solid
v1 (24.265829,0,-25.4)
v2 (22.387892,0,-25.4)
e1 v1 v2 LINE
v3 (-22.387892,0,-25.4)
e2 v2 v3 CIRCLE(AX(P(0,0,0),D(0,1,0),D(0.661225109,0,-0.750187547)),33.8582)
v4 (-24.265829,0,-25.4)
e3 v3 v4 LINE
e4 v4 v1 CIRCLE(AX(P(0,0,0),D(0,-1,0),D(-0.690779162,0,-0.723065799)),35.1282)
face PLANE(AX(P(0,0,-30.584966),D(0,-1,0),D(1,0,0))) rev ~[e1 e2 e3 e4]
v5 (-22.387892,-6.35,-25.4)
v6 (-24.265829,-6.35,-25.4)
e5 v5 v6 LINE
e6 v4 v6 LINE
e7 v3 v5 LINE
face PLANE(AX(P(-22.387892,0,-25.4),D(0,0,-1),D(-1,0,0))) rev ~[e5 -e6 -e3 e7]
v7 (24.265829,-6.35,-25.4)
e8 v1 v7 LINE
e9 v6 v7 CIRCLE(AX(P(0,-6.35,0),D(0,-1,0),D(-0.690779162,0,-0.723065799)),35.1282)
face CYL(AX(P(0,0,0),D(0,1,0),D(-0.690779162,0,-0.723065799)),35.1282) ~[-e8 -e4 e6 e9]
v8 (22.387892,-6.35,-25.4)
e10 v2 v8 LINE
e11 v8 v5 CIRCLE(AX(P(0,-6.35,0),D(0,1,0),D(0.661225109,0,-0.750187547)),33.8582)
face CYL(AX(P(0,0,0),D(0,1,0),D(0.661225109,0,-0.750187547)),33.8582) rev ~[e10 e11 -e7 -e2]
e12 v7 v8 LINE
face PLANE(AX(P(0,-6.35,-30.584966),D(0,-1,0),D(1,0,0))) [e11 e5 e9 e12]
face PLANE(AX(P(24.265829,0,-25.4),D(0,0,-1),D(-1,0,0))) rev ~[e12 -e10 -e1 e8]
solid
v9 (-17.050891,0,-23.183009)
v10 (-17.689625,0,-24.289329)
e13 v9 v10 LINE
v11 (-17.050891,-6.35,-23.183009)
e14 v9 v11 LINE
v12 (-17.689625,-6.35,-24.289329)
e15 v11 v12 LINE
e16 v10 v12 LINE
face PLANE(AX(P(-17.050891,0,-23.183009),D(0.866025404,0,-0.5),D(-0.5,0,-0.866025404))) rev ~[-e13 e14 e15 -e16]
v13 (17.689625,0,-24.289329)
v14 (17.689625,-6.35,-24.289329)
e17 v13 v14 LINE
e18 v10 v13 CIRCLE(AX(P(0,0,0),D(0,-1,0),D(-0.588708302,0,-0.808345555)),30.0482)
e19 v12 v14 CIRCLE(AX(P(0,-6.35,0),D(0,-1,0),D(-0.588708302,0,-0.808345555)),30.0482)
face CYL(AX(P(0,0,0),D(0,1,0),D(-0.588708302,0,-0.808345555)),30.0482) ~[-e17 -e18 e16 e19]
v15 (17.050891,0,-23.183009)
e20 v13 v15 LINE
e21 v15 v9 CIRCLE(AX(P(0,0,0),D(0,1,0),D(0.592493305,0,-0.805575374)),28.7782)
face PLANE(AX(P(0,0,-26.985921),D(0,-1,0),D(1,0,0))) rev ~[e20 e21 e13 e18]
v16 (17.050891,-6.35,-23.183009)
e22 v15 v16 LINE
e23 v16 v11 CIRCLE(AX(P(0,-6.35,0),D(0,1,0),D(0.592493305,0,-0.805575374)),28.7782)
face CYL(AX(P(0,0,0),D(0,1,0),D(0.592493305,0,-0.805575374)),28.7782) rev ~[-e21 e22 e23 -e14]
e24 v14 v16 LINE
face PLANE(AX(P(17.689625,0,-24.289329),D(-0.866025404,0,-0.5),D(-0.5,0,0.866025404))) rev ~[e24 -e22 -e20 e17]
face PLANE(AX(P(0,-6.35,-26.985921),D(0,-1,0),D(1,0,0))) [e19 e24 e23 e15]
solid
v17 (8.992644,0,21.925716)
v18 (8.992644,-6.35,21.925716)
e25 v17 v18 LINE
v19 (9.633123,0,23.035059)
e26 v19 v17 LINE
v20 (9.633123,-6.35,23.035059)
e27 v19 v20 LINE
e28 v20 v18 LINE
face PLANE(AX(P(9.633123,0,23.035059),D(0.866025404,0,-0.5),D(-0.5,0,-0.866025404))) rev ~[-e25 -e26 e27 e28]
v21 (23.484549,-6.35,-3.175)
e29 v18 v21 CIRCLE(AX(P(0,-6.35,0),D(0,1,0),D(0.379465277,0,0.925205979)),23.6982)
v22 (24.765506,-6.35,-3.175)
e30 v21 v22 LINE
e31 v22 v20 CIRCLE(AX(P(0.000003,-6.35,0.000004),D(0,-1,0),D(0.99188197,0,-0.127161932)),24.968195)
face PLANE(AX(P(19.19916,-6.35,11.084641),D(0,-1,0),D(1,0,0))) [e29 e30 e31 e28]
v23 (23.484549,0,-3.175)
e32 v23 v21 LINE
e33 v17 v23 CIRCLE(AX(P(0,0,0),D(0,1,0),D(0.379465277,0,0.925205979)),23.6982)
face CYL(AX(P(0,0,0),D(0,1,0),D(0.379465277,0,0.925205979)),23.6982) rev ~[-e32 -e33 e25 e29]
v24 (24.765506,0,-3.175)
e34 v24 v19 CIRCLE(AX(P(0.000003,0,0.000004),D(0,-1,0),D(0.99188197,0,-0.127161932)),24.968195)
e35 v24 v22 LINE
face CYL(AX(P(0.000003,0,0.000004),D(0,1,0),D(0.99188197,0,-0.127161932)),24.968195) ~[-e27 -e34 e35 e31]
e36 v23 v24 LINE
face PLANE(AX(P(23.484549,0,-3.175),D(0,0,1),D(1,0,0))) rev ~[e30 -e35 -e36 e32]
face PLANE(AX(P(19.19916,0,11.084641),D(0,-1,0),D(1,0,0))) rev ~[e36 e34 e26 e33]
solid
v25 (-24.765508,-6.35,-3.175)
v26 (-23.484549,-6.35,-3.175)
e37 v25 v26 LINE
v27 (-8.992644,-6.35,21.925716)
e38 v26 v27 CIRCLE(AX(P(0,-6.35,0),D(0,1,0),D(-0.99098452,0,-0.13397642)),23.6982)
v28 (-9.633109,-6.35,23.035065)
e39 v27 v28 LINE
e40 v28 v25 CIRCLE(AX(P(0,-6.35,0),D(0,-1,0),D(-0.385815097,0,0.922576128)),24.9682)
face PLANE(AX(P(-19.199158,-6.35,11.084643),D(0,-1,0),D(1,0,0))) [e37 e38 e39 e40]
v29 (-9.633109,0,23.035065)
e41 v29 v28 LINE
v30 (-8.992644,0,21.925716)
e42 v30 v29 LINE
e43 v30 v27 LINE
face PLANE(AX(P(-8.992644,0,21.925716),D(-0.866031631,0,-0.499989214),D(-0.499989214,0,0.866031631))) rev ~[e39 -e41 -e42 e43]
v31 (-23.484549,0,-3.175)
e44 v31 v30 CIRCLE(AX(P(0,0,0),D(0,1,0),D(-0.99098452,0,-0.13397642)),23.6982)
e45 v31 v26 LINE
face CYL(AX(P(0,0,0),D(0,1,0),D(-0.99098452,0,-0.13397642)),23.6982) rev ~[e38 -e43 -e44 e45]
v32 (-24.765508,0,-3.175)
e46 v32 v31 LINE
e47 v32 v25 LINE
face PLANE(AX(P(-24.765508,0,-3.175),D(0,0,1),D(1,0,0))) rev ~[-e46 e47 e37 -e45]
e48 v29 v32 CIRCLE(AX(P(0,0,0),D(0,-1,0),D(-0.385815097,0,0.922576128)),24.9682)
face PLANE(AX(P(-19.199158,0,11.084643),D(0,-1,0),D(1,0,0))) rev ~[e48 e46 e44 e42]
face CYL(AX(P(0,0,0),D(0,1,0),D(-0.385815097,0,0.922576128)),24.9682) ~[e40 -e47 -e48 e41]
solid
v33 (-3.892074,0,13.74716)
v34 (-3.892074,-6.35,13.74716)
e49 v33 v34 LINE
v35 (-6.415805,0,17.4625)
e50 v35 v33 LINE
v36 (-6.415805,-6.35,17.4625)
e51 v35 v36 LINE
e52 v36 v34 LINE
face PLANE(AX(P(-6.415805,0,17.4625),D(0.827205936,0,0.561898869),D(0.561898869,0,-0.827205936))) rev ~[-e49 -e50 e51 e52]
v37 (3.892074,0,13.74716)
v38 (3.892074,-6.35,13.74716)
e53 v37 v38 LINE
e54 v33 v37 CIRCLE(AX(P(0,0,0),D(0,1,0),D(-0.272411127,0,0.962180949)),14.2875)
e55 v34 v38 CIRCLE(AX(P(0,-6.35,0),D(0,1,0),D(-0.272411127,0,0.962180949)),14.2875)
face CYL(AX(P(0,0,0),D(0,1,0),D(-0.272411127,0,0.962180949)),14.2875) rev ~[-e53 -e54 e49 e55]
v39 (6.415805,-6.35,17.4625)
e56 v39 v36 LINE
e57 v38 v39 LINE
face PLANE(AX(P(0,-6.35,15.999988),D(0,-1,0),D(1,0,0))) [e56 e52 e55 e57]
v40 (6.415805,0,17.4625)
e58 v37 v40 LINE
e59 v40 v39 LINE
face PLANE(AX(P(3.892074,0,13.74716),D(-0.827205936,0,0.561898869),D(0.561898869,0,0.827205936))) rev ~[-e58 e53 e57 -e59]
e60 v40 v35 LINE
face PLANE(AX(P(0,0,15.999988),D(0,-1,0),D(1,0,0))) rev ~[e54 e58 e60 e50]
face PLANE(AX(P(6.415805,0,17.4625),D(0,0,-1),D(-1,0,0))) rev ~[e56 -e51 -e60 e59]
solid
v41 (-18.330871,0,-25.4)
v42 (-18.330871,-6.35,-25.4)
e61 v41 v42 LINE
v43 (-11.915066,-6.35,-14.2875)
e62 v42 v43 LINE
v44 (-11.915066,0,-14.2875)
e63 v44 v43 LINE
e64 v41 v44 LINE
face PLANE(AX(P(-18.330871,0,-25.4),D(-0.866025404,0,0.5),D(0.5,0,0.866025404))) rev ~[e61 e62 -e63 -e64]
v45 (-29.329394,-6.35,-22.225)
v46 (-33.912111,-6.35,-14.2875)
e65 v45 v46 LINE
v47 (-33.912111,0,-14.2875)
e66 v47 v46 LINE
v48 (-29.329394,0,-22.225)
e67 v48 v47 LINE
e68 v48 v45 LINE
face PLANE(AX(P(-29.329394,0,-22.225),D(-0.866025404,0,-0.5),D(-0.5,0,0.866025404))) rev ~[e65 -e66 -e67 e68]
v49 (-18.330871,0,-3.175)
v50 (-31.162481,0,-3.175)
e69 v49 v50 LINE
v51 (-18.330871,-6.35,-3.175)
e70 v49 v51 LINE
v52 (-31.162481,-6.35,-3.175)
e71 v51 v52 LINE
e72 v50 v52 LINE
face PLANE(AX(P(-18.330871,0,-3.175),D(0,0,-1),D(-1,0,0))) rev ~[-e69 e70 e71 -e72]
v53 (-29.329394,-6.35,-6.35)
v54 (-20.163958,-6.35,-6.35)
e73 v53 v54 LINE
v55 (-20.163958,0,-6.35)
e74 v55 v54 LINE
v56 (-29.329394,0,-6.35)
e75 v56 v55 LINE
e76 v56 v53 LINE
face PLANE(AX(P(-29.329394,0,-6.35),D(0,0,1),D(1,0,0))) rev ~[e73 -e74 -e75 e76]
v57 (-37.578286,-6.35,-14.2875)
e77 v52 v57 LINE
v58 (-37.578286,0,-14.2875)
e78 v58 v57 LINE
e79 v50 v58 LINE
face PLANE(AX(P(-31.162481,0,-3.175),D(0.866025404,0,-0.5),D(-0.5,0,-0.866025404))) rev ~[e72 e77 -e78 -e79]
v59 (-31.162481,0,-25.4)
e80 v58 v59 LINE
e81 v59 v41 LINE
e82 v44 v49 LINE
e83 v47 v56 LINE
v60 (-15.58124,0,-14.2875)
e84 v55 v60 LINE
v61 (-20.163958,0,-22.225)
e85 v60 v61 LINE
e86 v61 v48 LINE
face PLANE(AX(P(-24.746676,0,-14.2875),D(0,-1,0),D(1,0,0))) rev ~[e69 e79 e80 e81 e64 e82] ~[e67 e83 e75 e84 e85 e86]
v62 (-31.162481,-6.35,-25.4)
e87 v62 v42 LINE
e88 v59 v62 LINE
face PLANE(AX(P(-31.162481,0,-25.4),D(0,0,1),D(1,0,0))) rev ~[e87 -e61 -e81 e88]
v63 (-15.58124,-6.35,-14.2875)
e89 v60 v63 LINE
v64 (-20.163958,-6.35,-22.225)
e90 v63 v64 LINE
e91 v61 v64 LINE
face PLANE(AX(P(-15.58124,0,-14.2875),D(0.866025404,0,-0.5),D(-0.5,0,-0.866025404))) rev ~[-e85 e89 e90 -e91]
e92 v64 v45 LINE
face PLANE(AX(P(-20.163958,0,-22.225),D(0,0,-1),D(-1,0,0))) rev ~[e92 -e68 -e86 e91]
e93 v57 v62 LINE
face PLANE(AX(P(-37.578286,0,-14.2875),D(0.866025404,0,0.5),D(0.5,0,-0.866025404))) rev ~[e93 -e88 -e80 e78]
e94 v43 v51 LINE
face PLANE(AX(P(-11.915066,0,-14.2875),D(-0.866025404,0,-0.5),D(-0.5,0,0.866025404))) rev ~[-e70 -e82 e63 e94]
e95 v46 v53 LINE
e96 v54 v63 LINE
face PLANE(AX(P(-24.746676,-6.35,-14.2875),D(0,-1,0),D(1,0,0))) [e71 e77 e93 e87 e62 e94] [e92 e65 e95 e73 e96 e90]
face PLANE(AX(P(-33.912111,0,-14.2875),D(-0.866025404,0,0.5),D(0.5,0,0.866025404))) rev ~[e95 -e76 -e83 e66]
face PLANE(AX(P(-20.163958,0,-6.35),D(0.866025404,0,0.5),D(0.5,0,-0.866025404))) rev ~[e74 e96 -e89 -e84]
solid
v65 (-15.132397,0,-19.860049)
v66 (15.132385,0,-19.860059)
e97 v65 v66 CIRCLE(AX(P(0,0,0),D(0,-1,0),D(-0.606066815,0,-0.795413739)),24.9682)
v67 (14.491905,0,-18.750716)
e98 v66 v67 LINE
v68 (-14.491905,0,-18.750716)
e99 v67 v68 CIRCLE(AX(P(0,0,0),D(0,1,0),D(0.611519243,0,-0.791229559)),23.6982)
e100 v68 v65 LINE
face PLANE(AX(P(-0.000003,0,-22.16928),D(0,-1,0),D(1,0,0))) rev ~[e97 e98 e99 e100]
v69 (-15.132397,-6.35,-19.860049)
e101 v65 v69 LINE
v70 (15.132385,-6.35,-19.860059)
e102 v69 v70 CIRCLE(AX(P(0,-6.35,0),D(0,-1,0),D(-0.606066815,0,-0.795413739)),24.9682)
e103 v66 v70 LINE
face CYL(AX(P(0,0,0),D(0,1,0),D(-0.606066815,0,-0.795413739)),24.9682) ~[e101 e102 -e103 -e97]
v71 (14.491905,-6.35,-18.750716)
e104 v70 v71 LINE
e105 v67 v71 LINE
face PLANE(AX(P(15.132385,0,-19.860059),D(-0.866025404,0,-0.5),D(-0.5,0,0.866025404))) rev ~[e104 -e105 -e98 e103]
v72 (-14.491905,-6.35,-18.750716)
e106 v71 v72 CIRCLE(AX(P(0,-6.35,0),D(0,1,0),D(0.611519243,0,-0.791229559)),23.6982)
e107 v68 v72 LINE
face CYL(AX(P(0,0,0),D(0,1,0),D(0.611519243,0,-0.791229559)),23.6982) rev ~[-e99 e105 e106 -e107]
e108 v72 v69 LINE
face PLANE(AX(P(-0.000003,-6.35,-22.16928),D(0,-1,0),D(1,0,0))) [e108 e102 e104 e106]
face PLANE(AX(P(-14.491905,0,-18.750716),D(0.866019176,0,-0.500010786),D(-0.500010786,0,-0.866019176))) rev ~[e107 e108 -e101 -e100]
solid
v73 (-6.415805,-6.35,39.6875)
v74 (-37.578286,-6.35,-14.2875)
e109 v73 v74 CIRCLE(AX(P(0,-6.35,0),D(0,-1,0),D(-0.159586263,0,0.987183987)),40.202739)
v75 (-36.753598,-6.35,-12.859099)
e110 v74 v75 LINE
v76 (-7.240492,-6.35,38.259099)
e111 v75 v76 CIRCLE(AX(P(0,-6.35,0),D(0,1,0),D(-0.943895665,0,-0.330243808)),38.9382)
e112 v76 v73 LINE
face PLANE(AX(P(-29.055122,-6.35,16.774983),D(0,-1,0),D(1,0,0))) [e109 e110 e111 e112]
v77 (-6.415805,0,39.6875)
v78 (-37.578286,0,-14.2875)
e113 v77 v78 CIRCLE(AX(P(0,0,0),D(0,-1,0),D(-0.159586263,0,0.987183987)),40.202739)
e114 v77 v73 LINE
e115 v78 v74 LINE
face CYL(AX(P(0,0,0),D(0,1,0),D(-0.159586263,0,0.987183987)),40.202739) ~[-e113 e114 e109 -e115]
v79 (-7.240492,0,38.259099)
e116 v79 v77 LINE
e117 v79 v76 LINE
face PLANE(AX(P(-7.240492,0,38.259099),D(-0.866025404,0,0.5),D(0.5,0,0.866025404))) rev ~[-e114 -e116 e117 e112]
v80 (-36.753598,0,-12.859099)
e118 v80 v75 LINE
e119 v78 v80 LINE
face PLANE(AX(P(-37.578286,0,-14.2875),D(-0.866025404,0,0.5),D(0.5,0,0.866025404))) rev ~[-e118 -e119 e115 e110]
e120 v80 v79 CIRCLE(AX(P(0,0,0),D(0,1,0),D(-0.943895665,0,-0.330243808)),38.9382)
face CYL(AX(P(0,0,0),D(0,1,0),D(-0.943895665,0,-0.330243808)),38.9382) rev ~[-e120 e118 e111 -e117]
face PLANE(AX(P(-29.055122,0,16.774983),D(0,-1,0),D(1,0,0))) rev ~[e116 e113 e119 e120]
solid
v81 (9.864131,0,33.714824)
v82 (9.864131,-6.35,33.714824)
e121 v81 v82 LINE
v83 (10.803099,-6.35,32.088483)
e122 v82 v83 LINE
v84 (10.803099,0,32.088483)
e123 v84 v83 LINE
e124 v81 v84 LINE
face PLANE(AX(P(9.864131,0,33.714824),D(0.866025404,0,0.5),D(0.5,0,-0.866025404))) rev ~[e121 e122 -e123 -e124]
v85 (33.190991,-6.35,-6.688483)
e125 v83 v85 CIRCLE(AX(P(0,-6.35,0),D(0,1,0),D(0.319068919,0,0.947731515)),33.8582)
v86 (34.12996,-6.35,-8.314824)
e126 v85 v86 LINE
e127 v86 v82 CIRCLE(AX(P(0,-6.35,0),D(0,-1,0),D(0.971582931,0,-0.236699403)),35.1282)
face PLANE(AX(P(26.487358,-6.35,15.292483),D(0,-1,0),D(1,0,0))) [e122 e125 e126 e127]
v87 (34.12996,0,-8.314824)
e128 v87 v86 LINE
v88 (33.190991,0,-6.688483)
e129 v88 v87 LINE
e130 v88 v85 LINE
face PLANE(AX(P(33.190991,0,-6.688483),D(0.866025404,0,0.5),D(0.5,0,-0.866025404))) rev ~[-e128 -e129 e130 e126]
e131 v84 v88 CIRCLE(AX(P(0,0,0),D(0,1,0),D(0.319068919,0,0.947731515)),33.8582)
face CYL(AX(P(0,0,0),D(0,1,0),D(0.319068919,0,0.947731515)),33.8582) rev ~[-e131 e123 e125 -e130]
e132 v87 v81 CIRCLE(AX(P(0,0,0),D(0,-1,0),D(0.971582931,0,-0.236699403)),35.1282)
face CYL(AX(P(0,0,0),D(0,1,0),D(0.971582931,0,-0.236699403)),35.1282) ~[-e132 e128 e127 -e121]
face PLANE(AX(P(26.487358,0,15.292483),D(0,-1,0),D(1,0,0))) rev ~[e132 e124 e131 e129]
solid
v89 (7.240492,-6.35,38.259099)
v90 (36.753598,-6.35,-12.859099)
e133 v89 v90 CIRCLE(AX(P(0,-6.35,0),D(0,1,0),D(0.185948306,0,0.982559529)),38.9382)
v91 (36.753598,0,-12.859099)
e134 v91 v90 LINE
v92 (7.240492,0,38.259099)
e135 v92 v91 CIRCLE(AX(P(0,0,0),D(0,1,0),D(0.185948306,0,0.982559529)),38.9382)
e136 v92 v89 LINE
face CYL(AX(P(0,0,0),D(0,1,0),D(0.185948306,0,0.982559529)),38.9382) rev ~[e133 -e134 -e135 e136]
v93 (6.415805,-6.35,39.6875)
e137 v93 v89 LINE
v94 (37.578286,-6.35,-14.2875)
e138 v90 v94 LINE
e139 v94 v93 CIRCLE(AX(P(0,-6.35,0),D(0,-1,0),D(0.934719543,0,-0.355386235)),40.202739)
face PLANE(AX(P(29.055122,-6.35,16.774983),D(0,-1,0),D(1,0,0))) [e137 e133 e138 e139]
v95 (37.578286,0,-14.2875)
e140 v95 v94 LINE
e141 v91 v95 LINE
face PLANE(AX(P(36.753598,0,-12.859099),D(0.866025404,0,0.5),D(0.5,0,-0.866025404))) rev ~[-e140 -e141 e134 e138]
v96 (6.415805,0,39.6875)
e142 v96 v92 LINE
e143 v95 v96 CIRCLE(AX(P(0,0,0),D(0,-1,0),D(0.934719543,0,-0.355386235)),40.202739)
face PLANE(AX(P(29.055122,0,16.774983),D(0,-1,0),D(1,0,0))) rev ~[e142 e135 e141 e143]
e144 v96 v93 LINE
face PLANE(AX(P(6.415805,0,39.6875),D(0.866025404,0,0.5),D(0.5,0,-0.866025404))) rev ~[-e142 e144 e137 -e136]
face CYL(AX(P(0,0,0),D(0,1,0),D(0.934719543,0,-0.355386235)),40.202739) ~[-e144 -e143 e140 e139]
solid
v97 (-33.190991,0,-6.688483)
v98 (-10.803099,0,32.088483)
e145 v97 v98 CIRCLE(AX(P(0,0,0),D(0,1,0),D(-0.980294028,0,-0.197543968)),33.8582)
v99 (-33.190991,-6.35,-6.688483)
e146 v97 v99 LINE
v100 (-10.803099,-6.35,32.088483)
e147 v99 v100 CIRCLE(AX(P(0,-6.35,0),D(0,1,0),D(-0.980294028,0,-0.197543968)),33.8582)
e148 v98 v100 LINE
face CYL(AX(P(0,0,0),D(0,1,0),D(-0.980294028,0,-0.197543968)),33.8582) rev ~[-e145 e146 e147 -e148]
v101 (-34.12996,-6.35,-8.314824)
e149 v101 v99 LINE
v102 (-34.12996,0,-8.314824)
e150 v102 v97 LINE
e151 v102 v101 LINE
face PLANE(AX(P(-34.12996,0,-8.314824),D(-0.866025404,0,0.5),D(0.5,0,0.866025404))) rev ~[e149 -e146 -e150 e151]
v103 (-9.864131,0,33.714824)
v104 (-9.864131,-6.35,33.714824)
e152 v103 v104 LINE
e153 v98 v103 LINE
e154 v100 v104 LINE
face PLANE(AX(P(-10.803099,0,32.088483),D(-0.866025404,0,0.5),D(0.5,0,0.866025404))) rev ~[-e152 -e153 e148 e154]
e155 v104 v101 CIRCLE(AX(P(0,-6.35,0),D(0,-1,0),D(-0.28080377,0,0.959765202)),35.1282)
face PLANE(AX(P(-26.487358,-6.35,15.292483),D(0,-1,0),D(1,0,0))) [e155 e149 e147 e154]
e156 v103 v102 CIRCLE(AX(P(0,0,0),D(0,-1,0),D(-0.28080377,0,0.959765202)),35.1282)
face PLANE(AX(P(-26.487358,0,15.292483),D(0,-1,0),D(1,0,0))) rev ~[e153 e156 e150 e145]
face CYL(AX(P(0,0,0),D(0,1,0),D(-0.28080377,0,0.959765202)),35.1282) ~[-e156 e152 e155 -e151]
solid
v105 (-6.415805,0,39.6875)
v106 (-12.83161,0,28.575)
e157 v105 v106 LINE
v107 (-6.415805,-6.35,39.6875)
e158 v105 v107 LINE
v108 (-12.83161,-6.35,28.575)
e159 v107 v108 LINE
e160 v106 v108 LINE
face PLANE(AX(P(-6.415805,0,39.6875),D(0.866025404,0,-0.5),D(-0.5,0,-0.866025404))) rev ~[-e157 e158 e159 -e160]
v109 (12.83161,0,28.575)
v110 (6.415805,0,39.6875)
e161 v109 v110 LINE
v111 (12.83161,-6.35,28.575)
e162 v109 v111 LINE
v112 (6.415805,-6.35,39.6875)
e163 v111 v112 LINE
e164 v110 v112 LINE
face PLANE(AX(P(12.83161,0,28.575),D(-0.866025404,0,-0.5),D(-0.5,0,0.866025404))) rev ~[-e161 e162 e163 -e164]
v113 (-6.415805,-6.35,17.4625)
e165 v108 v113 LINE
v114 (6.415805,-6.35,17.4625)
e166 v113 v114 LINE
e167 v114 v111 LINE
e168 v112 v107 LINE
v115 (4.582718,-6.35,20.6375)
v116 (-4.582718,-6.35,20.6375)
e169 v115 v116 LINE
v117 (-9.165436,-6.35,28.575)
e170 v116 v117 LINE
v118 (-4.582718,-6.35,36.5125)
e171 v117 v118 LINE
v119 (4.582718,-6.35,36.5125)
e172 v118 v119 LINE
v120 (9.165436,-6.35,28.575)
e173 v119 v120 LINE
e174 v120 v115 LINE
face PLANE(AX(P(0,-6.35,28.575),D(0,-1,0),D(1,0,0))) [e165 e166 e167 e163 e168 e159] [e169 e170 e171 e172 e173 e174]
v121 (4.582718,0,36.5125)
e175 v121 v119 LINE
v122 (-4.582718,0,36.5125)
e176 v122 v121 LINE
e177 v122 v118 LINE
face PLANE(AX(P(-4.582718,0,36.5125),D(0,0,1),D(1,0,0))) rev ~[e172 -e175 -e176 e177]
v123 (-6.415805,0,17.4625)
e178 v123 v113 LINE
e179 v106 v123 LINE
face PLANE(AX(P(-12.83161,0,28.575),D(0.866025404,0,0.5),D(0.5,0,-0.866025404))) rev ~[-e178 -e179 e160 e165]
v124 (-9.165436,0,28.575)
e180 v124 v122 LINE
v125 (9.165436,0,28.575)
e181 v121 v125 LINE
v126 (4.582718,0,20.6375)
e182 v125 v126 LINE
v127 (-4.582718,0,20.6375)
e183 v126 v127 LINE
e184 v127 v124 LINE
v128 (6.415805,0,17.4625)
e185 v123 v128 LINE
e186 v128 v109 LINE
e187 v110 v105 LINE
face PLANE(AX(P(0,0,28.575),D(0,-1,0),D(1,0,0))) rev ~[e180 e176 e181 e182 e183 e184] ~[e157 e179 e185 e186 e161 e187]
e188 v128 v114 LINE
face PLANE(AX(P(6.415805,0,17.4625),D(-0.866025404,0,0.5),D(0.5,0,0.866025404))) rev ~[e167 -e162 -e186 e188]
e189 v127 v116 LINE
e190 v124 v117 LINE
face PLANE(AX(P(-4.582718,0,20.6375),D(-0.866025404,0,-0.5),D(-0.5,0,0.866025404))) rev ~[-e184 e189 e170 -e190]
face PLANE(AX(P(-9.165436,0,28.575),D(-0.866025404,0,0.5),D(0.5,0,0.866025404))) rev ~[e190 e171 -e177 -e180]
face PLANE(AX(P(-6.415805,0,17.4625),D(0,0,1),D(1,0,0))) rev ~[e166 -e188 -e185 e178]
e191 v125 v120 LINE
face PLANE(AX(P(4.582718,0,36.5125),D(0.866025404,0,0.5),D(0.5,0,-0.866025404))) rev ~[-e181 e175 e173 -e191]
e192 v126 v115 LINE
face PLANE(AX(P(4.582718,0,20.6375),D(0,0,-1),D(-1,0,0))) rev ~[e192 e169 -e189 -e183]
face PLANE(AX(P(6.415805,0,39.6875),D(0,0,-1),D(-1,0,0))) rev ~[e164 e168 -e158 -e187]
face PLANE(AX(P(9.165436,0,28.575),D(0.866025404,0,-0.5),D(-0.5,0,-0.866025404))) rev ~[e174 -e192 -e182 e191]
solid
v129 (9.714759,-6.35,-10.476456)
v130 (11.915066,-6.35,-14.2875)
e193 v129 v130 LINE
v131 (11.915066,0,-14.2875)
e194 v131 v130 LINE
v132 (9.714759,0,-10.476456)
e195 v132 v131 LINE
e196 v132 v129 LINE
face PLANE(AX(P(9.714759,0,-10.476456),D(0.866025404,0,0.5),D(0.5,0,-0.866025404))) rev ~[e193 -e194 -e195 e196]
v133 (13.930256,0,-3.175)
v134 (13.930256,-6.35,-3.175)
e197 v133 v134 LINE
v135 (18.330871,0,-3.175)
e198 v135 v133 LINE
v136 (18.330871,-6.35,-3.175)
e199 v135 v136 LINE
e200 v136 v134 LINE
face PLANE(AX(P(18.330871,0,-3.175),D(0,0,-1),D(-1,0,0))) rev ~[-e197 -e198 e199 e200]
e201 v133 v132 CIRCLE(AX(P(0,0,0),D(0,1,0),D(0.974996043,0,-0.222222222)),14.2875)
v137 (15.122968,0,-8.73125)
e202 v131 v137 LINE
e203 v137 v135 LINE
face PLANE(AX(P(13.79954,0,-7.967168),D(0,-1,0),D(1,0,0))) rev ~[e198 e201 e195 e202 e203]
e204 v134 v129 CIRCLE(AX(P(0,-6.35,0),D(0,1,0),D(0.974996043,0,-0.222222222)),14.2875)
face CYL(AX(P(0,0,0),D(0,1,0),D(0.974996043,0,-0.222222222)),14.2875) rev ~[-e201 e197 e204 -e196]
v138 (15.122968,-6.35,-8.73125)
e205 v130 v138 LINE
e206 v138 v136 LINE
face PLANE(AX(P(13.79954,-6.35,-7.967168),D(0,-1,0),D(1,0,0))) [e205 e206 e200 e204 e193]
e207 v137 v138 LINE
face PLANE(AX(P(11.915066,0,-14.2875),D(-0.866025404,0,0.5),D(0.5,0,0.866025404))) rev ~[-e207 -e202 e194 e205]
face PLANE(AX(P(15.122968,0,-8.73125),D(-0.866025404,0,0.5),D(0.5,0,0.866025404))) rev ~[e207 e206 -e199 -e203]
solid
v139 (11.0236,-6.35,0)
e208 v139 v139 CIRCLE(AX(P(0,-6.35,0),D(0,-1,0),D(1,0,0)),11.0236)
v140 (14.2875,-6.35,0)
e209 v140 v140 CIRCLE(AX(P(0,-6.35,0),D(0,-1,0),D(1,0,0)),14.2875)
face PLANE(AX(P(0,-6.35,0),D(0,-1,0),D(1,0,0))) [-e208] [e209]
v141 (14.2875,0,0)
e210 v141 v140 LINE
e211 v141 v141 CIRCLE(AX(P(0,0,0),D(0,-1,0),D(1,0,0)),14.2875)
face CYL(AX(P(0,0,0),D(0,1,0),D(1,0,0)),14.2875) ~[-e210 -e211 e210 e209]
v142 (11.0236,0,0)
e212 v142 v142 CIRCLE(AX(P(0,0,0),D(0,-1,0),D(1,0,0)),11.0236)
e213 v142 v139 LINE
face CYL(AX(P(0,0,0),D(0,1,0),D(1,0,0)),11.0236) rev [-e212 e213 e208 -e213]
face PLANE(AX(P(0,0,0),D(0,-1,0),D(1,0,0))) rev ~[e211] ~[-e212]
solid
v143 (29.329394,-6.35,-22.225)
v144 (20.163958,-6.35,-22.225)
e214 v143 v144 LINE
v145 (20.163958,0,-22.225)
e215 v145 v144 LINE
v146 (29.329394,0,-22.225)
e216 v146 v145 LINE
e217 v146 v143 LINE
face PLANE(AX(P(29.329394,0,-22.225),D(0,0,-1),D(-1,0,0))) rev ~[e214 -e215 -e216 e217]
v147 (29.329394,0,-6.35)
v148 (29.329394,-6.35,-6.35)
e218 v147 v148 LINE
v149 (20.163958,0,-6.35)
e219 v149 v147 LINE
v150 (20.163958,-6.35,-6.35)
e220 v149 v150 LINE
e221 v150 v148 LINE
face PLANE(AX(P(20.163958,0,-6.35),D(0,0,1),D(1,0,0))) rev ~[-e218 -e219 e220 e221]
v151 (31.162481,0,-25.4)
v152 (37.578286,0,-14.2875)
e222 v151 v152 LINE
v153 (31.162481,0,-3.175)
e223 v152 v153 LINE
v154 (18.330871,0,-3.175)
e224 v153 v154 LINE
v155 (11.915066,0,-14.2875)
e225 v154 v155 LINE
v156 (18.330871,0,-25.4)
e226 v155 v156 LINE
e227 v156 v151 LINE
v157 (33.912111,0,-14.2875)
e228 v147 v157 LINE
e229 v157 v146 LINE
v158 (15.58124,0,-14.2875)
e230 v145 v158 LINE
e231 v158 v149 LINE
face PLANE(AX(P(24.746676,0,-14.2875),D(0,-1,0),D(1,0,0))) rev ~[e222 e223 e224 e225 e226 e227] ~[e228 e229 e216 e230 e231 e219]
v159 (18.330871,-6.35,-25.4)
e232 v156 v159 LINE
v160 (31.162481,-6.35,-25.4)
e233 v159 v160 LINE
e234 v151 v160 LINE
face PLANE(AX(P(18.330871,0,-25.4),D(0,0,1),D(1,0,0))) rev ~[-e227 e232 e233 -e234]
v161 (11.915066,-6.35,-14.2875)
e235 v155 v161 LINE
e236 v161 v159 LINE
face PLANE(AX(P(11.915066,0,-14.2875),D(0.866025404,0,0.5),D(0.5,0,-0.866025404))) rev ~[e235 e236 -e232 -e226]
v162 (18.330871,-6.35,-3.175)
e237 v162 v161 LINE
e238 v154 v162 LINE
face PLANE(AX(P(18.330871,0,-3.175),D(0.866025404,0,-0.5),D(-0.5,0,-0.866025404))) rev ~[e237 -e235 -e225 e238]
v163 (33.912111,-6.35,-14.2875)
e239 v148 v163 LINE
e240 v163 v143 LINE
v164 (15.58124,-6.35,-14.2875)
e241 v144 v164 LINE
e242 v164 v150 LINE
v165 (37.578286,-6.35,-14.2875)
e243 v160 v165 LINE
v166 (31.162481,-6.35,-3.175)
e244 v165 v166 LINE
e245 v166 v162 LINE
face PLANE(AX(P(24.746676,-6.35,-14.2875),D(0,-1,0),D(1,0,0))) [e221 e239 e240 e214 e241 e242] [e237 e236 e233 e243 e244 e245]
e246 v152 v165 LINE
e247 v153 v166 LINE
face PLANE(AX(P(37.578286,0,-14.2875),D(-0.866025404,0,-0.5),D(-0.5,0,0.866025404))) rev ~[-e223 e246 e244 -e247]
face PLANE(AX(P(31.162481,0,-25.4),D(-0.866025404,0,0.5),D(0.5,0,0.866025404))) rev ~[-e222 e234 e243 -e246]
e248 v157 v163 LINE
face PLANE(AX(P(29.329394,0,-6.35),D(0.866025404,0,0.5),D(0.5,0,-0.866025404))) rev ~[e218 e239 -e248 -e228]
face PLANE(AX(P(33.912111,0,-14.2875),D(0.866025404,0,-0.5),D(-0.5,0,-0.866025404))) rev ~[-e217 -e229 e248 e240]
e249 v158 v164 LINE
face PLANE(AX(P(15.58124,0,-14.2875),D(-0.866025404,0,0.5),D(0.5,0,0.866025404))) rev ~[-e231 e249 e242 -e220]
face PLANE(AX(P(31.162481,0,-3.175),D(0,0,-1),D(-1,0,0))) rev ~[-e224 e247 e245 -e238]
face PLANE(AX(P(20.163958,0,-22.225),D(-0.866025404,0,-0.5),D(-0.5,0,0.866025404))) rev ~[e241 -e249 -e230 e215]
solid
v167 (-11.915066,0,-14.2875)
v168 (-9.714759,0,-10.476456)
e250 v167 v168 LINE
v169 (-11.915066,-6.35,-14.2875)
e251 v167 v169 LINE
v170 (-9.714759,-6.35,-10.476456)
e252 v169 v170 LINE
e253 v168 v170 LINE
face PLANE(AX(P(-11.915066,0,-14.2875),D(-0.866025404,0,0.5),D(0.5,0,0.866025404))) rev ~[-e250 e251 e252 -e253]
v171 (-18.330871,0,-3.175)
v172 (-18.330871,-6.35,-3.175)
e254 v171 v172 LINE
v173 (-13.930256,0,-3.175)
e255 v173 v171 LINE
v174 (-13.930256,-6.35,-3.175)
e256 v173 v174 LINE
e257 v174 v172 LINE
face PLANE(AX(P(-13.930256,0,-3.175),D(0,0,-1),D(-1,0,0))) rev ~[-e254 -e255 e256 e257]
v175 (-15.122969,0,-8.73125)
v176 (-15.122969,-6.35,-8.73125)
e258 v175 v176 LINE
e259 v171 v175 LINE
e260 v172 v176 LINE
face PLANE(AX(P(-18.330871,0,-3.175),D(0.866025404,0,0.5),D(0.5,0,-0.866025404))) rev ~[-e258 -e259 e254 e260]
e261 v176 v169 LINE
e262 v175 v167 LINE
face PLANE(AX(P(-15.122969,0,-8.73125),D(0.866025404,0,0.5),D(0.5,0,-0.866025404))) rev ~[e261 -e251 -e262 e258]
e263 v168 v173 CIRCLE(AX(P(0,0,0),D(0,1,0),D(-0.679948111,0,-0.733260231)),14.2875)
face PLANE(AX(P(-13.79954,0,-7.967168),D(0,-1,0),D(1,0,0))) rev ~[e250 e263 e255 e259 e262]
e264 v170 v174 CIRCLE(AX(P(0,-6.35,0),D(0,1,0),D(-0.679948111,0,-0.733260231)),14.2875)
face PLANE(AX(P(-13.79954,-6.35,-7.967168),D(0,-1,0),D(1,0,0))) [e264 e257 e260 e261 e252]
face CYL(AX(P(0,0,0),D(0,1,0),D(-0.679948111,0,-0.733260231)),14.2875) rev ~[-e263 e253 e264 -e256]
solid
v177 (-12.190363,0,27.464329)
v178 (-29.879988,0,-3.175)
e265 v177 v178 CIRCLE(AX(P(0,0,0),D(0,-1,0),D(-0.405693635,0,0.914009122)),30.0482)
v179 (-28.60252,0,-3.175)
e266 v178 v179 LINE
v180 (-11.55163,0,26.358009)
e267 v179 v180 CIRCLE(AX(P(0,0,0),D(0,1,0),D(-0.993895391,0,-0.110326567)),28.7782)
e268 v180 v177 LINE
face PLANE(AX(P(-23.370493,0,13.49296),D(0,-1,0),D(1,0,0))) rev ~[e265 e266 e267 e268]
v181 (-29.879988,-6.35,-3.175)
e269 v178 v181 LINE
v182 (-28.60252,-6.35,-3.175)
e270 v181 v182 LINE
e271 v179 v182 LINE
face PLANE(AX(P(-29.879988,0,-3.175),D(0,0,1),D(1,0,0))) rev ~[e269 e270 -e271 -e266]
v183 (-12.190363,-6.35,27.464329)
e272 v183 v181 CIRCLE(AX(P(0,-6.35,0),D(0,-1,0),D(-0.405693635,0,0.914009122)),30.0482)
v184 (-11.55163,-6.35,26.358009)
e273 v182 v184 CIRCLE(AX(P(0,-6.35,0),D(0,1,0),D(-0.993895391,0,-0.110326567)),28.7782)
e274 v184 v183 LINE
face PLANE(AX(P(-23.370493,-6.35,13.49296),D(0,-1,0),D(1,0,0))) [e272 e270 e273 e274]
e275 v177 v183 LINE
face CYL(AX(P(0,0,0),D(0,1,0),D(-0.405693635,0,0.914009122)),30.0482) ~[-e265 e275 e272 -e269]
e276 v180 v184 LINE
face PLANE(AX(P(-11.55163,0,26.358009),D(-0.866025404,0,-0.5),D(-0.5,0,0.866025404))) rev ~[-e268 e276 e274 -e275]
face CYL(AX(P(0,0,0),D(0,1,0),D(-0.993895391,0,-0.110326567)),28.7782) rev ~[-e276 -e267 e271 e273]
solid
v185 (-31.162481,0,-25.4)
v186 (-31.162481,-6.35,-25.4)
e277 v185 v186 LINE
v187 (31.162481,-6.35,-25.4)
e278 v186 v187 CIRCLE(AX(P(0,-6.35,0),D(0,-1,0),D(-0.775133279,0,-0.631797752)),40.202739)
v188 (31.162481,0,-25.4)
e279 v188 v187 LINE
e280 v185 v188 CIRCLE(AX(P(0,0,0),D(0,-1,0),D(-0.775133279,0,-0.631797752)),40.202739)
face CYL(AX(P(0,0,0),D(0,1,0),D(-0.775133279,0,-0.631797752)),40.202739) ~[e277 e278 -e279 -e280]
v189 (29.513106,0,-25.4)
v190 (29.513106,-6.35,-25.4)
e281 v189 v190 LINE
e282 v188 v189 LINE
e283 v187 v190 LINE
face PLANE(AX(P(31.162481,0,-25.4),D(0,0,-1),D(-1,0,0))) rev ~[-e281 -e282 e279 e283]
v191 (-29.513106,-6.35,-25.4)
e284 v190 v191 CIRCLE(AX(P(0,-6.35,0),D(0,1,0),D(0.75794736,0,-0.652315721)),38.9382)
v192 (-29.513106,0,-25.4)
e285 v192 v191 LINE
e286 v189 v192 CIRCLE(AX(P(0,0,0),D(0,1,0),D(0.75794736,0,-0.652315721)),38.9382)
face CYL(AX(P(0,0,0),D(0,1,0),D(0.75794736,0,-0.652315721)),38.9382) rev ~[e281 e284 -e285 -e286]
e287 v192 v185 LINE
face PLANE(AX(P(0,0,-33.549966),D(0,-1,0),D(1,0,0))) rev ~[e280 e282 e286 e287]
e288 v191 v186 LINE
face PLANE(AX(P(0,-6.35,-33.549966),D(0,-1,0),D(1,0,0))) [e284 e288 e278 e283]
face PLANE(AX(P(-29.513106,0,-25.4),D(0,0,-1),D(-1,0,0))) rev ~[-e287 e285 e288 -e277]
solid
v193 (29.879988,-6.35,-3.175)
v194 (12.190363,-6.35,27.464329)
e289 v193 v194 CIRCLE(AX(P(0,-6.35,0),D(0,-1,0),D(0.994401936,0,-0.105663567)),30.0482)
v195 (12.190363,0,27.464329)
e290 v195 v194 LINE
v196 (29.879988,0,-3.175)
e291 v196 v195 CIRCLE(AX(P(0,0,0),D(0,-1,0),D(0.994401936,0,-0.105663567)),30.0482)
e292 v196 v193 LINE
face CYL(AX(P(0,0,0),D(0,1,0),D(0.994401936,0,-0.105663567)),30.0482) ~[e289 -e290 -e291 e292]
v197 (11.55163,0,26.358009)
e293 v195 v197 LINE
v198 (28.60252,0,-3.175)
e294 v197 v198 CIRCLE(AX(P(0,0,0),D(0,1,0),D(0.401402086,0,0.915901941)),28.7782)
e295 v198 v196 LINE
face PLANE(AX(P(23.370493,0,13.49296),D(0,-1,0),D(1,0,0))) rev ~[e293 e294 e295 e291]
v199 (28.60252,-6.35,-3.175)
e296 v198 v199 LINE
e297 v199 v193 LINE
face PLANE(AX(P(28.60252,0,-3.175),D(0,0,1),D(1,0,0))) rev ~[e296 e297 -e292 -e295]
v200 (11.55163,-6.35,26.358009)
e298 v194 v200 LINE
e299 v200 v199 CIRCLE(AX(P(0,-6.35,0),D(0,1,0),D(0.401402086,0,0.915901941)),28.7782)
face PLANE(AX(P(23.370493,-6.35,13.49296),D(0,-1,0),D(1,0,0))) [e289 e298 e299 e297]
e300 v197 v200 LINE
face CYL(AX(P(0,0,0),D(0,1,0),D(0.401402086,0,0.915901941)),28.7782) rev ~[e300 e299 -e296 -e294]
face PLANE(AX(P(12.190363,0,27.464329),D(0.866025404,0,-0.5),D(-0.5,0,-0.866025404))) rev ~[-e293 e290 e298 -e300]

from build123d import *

# Parameters (mm, degrees)
F0_R     = 14.2875
F0_R_2   = 11.0236
F2_DEPTH = 6.35


# Not quite as in the source:
# - ends of sketch curves that miss each other by under 0.0002 mm in the source are joined


with BuildPart() as f2:
    # F0 (on Front) → F2 (new body)
    with BuildSketch(Plane.XZ):
        Circle(F0_R)
        Circle(F0_R_2, mode=Mode.SUBTRACT)
    extrude(amount=F2_DEPTH)


with BuildPart() as f2b:
    # F0 (on Front) → F2, piece 2 (new body)
    with BuildSketch(Plane.XZ):
        Polygon((-6.4158048664, 17.4625), (6.4158048664, 17.4625), (12.8316097327, 28.575), (6.4158048664, 39.6875), (-6.4158048664, 39.6875), (-12.8316097327, 28.575), align=None)
        Polygon((9.1654355234, 28.575), (4.5827177617, 20.6375), (-4.5827177617, 20.6375), (-9.1654355234, 28.575), (-4.5827177617, 36.5125), (4.5827177617, 36.5125), align=None, mode=Mode.SUBTRACT)
    extrude(amount=F2_DEPTH)


with BuildPart() as f2c:
    # F0 (on Front) → F2, piece 3 (new body)
    with BuildSketch(Plane.XZ):
        Polygon((-31.1624807795, -25.4), (-18.3308710468, -25.4), (-11.9150661804, -14.2875), (-18.3308710468, -3.175), (-31.1624807795, -3.175), (-37.5782856459, -14.2875), align=None)
        Polygon((-33.9121114365, -14.2875), (-29.3293936748, -6.35), (-20.1639581514, -6.35), (-15.5812403898, -14.2875), (-20.1639581514, -22.225), (-29.3293936748, -22.225), align=None, mode=Mode.SUBTRACT)
    extrude(amount=F2_DEPTH)


with BuildPart() as f2d:
    # F0 (on Front) → F2, piece 4 (new body)
    with BuildSketch(Plane.XZ):
        Polygon((37.5782856459, -14.2875), (31.1624807795, -3.175), (18.3308710468, -3.175), (11.9150661804, -14.2875), (18.3308710468, -25.4), (31.1624807795, -25.4), align=None)
        Polygon((29.3293936748, -22.225), (20.1639581514, -22.225), (15.5812403898, -14.2875), (20.1639581514, -6.35), (29.3293936748, -6.35), (33.9121114365, -14.2875), align=None, mode=Mode.SUBTRACT)
    extrude(amount=F2_DEPTH)


with BuildPart() as f2e:
    # F1 (on Front) → F2, piece 5 (new body)
    with BuildSketch(Plane.XZ):
        with BuildLine():
            ThreePointArc((-36.7535982008, -12.8590994448), (-33.7214703776, 19.4691), (-7.2404923114, 38.2590994448))
            Line((-7.2404923114, 38.2590994448), (-6.4158048664, 39.6875))
            ThreePointArc((-6.4158048664, 39.6875), (-34.8165931166, 20.1013694082), (-37.5782856459, -14.2875))
            Line((-37.5782856459, -14.2875), (-36.7535982008, -12.8590994448))
        make_face()
    extrude(amount=F2_DEPTH)


with BuildPart() as f2f:
    # F1 (on Front) → F2, piece 6 (new body)
    with BuildSketch(Plane.XZ):
        with BuildLine():
            Line((-10.8030992669, 32.0884831905), (-9.8641309809, 33.7148239686))
            ThreePointArc((-9.8641309809, 33.7148239686), (-30.4219135892, 17.5641), (-34.1299595314, -8.3148239686))
            Line((-34.1299595314, -8.3148239686), (-33.1909912454, -6.6884831905))
            ThreePointArc((-33.1909912454, -6.6884831905), (-29.3220613264, 16.9291), (-10.8030992669, 32.0884831905))
        make_face()
    extrude(amount=F2_DEPTH)


with BuildPart() as f2g:
    # F1 (on Front) → F2, piece 7 (new body)
    with BuildSketch(Plane.XZ):
        with BuildLine():
            ThreePointArc((-9.6331085014, 23.0350652667), (-21.6230914657, 12.4841069647), (-24.7655079948, -3.175))
            Line((-24.7655079948, -3.175), (-23.4845493514, -3.175))
            ThreePointArc((-23.4845493514, -3.175), (-20.523243224, 11.8491), (-8.9926440187, 21.9257163348))
            Line((-8.9926440187, 21.9257163348), (-9.6331085014, 23.0350652667))
        make_face()
    extrude(amount=F2_DEPTH)


with BuildPart() as f2h:
    # F1 (on Front) → F2, piece 8 (new body)
    with BuildSketch(Plane.XZ):
        with BuildLine():
            ThreePointArc((-28.6025203477, -3.175), (-24.9226522752, 14.3891), (-11.5516295168, 26.3580092334))
            Line((-11.5516295168, 26.3580092334), (-12.1903634715, 27.4643288954))
            ThreePointArc((-12.1903634715, 27.4643288954), (-26.022504538, 15.0241), (-29.879988257, -3.175))
            Line((-29.879988257, -3.175), (-28.6025203477, -3.175))
        make_face()
    extrude(amount=F2_DEPTH)


with BuildPart() as f2i:
    # F1 (on Front) → F2, piece 9 (new body)
    with BuildSketch(Plane.XZ):
        with BuildLine():
            ThreePointArc((-15.132397448, -19.860049313), (-8.0421e-06, -24.9682), (15.1323846544, -19.8600590611))
            Line((15.1323846544, -19.8600590611), (14.4919053327, -18.7507163348))
            ThreePointArc((14.4919053327, -18.7507163348), (0, -23.6982), (-14.4919053327, -18.7507163348))
            Line((-14.4919053327, -18.7507163348), (-15.132397448, -19.860049313))
        make_face()
    extrude(amount=F2_DEPTH)


with BuildPart() as f2j:
    # F1 (on Front) → F2, piece 10 (new body)
    with BuildSketch(Plane.XZ):
        with BuildLine():
            Line((17.6896247855, -24.2893288954), (17.0508908309, -23.1830092334))
            ThreePointArc((17.0508908309, -23.1830092334), (0, -28.7782), (-17.0508908309, -23.1830092334))
            Line((-17.0508908309, -23.1830092334), (-17.6896247855, -24.2893288954))
            ThreePointArc((-17.6896247855, -24.2893288954), (0, -30.0482), (17.6896247855, -24.2893288954))
        make_face()
    extrude(amount=F2_DEPTH)


with BuildPart() as f2k:
    # F1 (on Front) → F2, piece 11 (new body)
    with BuildSketch(Plane.XZ):
        with BuildLine():
            Line((-29.5131058894, -25.4), (-31.1624807795, -25.4))
            ThreePointArc((-31.1624807795, -25.4), (0, -40.2027388163), (31.1624807795, -25.4))
            Line((31.1624807795, -25.4), (29.5131058894, -25.4))
            ThreePointArc((29.5131058894, -25.4), (0, -38.9382), (-29.5131058894, -25.4))
        make_face()
    extrude(amount=F2_DEPTH)


with BuildPart() as f2l:
    # F1 (on Front) → F2, piece 12 (new body)
    with BuildSketch(Plane.XZ):
        with BuildLine():
            Line((-22.3878919785, -25.4), (-24.2658285505, -25.4))
            ThreePointArc((-24.2658285505, -25.4), (0, -35.1282), (24.2658285505, -25.4))
            Line((24.2658285505, -25.4), (22.3878919785, -25.4))
            ThreePointArc((22.3878919785, -25.4), (0, -33.8582), (-22.3878919785, -25.4))
        make_face()
    extrude(amount=F2_DEPTH)


with BuildPart() as f2m:
    # F1 (on Front) → F2, piece 13 (new body)
    with BuildSketch(Plane.XZ):
        with BuildLine():
            Line((9.6331233404, 23.0350590611), (8.9926440187, 21.9257163348))
            ThreePointArc((8.9926440187, 21.9257163348), (20.523243224, 11.8491), (23.4845493514, -3.175))
            Line((23.4845493514, -3.175), (24.7655059495, -3.175))
            ThreePointArc((24.7655059495, -3.175), (21.6230995078, 12.4840930353), (9.6331233404, 23.0350590611))
        make_face()
    extrude(amount=F2_DEPTH)


with BuildPart() as f2n:
    # F1 (on Front) → F2, piece 14 (new body)
    with BuildSketch(Plane.XZ):
        with BuildLine():
            Line((12.1903634715, 27.4643288954), (11.5516295168, 26.3580092334))
            ThreePointArc((11.5516295168, 26.3580092334), (24.9226522752, 14.3891), (28.6025203477, -3.175))
            Line((28.6025203477, -3.175), (29.879988257, -3.175))
            ThreePointArc((29.879988257, -3.175), (26.022504538, 15.0241), (12.1903634715, 27.4643288954))
        make_face()
    extrude(amount=F2_DEPTH)


with BuildPart() as f2o:
    # F1 (on Front) → F2, piece 15 (new body)
    with BuildSketch(Plane.XZ):
        with BuildLine():
            ThreePointArc((34.1299595314, -8.3148239686), (30.4219135892, 17.5641), (9.8641309809, 33.7148239686))
            Line((9.8641309809, 33.7148239686), (10.8030992669, 32.0884831905))
            ThreePointArc((10.8030992669, 32.0884831905), (29.3220613264, 16.9291), (33.1909912454, -6.6884831905))
            Line((33.1909912454, -6.6884831905), (34.1299595314, -8.3148239686))
        make_face()
    extrude(amount=F2_DEPTH)


with BuildPart() as f2p:
    # F1 (on Front) → F2, piece 16 (new body)
    with BuildSketch(Plane.XZ):
        with BuildLine():
            ThreePointArc((37.5782856459, -14.2875), (34.8165931166, 20.1013694082), (6.4158048664, 39.6875))
            Line((6.4158048664, 39.6875), (7.2404923114, 38.2590994448))
            ThreePointArc((7.2404923114, 38.2590994448), (33.7214703776, 19.4691), (36.7535982008, -12.8590994448))
            Line((36.7535982008, -12.8590994448), (37.5782856459, -14.2875))
        make_face()
    extrude(amount=F2_DEPTH)


with BuildPart() as f2q:
    # F1 (on Front) → F2, piece 17 (new body)
    with BuildSketch(Plane.XZ):
        with BuildLine():
            Line((15.1229684123, -8.7312503486), (18.3308710468, -3.175))
            Line((18.3308710468, -3.175), (13.930255965, -3.175))
            ThreePointArc((13.930255965, -3.175), (12.3733379566, -7.14375), (9.7147586395, -10.4764555469))
            Line((9.7147586395, -10.4764555469), (11.9150661804, -14.2875))
            Line((11.9150661804, -14.2875), (15.1229684123, -8.7312503486))
        make_face()
    extrude(amount=F2_DEPTH)


with BuildPart() as f2r:
    # F1 (on Front) → F2, piece 18 (new body)
    with BuildSketch(Plane.XZ):
        with BuildLine():
            Line((3.8920739769, 13.7471603034), (6.4158048664, 17.4625))
            Line((6.4158048664, 17.4625), (0, 17.4625))
            Line((0, 17.4625), (-6.4158048664, 17.4625))
            Line((-6.4158048664, 17.4625), (-3.8920739769, 13.7471603034))
            ThreePointArc((-3.8920739769, 13.7471603034), (0, 14.2875), (3.8920739769, 13.7471603034))
        make_face()
    extrude(amount=F2_DEPTH)


with BuildPart() as f2s:
    # F1 (on Front) → F2, piece 19 (new body)
    with BuildSketch(Plane.XZ):
        with BuildLine():
            ThreePointArc((-9.7147586395, -10.4764555469), (-12.3733379566, -7.14375), (-13.930255965, -3.175))
            Line((-13.930255965, -3.175), (-18.3308710468, -3.175))
            Line((-18.3308710468, -3.175), (-15.1229686466, -8.7312499429))
            Line((-15.1229686466, -8.7312499429), (-11.9150661804, -14.2875))
            Line((-11.9150661804, -14.2875), (-9.7147586395, -10.4764555469))
        make_face()
    extrude(amount=F2_DEPTH)


solid = Compound([f2.part, f2b.part, f2c.part, f2d.part, f2e.part, f2f.part, f2g.part, f2h.part, f2i.part, f2j.part, f2k.part, f2l.part, f2m.part, f2n.part, f2o.part, f2p.part, f2q.part, f2r.part, f2s.part])
